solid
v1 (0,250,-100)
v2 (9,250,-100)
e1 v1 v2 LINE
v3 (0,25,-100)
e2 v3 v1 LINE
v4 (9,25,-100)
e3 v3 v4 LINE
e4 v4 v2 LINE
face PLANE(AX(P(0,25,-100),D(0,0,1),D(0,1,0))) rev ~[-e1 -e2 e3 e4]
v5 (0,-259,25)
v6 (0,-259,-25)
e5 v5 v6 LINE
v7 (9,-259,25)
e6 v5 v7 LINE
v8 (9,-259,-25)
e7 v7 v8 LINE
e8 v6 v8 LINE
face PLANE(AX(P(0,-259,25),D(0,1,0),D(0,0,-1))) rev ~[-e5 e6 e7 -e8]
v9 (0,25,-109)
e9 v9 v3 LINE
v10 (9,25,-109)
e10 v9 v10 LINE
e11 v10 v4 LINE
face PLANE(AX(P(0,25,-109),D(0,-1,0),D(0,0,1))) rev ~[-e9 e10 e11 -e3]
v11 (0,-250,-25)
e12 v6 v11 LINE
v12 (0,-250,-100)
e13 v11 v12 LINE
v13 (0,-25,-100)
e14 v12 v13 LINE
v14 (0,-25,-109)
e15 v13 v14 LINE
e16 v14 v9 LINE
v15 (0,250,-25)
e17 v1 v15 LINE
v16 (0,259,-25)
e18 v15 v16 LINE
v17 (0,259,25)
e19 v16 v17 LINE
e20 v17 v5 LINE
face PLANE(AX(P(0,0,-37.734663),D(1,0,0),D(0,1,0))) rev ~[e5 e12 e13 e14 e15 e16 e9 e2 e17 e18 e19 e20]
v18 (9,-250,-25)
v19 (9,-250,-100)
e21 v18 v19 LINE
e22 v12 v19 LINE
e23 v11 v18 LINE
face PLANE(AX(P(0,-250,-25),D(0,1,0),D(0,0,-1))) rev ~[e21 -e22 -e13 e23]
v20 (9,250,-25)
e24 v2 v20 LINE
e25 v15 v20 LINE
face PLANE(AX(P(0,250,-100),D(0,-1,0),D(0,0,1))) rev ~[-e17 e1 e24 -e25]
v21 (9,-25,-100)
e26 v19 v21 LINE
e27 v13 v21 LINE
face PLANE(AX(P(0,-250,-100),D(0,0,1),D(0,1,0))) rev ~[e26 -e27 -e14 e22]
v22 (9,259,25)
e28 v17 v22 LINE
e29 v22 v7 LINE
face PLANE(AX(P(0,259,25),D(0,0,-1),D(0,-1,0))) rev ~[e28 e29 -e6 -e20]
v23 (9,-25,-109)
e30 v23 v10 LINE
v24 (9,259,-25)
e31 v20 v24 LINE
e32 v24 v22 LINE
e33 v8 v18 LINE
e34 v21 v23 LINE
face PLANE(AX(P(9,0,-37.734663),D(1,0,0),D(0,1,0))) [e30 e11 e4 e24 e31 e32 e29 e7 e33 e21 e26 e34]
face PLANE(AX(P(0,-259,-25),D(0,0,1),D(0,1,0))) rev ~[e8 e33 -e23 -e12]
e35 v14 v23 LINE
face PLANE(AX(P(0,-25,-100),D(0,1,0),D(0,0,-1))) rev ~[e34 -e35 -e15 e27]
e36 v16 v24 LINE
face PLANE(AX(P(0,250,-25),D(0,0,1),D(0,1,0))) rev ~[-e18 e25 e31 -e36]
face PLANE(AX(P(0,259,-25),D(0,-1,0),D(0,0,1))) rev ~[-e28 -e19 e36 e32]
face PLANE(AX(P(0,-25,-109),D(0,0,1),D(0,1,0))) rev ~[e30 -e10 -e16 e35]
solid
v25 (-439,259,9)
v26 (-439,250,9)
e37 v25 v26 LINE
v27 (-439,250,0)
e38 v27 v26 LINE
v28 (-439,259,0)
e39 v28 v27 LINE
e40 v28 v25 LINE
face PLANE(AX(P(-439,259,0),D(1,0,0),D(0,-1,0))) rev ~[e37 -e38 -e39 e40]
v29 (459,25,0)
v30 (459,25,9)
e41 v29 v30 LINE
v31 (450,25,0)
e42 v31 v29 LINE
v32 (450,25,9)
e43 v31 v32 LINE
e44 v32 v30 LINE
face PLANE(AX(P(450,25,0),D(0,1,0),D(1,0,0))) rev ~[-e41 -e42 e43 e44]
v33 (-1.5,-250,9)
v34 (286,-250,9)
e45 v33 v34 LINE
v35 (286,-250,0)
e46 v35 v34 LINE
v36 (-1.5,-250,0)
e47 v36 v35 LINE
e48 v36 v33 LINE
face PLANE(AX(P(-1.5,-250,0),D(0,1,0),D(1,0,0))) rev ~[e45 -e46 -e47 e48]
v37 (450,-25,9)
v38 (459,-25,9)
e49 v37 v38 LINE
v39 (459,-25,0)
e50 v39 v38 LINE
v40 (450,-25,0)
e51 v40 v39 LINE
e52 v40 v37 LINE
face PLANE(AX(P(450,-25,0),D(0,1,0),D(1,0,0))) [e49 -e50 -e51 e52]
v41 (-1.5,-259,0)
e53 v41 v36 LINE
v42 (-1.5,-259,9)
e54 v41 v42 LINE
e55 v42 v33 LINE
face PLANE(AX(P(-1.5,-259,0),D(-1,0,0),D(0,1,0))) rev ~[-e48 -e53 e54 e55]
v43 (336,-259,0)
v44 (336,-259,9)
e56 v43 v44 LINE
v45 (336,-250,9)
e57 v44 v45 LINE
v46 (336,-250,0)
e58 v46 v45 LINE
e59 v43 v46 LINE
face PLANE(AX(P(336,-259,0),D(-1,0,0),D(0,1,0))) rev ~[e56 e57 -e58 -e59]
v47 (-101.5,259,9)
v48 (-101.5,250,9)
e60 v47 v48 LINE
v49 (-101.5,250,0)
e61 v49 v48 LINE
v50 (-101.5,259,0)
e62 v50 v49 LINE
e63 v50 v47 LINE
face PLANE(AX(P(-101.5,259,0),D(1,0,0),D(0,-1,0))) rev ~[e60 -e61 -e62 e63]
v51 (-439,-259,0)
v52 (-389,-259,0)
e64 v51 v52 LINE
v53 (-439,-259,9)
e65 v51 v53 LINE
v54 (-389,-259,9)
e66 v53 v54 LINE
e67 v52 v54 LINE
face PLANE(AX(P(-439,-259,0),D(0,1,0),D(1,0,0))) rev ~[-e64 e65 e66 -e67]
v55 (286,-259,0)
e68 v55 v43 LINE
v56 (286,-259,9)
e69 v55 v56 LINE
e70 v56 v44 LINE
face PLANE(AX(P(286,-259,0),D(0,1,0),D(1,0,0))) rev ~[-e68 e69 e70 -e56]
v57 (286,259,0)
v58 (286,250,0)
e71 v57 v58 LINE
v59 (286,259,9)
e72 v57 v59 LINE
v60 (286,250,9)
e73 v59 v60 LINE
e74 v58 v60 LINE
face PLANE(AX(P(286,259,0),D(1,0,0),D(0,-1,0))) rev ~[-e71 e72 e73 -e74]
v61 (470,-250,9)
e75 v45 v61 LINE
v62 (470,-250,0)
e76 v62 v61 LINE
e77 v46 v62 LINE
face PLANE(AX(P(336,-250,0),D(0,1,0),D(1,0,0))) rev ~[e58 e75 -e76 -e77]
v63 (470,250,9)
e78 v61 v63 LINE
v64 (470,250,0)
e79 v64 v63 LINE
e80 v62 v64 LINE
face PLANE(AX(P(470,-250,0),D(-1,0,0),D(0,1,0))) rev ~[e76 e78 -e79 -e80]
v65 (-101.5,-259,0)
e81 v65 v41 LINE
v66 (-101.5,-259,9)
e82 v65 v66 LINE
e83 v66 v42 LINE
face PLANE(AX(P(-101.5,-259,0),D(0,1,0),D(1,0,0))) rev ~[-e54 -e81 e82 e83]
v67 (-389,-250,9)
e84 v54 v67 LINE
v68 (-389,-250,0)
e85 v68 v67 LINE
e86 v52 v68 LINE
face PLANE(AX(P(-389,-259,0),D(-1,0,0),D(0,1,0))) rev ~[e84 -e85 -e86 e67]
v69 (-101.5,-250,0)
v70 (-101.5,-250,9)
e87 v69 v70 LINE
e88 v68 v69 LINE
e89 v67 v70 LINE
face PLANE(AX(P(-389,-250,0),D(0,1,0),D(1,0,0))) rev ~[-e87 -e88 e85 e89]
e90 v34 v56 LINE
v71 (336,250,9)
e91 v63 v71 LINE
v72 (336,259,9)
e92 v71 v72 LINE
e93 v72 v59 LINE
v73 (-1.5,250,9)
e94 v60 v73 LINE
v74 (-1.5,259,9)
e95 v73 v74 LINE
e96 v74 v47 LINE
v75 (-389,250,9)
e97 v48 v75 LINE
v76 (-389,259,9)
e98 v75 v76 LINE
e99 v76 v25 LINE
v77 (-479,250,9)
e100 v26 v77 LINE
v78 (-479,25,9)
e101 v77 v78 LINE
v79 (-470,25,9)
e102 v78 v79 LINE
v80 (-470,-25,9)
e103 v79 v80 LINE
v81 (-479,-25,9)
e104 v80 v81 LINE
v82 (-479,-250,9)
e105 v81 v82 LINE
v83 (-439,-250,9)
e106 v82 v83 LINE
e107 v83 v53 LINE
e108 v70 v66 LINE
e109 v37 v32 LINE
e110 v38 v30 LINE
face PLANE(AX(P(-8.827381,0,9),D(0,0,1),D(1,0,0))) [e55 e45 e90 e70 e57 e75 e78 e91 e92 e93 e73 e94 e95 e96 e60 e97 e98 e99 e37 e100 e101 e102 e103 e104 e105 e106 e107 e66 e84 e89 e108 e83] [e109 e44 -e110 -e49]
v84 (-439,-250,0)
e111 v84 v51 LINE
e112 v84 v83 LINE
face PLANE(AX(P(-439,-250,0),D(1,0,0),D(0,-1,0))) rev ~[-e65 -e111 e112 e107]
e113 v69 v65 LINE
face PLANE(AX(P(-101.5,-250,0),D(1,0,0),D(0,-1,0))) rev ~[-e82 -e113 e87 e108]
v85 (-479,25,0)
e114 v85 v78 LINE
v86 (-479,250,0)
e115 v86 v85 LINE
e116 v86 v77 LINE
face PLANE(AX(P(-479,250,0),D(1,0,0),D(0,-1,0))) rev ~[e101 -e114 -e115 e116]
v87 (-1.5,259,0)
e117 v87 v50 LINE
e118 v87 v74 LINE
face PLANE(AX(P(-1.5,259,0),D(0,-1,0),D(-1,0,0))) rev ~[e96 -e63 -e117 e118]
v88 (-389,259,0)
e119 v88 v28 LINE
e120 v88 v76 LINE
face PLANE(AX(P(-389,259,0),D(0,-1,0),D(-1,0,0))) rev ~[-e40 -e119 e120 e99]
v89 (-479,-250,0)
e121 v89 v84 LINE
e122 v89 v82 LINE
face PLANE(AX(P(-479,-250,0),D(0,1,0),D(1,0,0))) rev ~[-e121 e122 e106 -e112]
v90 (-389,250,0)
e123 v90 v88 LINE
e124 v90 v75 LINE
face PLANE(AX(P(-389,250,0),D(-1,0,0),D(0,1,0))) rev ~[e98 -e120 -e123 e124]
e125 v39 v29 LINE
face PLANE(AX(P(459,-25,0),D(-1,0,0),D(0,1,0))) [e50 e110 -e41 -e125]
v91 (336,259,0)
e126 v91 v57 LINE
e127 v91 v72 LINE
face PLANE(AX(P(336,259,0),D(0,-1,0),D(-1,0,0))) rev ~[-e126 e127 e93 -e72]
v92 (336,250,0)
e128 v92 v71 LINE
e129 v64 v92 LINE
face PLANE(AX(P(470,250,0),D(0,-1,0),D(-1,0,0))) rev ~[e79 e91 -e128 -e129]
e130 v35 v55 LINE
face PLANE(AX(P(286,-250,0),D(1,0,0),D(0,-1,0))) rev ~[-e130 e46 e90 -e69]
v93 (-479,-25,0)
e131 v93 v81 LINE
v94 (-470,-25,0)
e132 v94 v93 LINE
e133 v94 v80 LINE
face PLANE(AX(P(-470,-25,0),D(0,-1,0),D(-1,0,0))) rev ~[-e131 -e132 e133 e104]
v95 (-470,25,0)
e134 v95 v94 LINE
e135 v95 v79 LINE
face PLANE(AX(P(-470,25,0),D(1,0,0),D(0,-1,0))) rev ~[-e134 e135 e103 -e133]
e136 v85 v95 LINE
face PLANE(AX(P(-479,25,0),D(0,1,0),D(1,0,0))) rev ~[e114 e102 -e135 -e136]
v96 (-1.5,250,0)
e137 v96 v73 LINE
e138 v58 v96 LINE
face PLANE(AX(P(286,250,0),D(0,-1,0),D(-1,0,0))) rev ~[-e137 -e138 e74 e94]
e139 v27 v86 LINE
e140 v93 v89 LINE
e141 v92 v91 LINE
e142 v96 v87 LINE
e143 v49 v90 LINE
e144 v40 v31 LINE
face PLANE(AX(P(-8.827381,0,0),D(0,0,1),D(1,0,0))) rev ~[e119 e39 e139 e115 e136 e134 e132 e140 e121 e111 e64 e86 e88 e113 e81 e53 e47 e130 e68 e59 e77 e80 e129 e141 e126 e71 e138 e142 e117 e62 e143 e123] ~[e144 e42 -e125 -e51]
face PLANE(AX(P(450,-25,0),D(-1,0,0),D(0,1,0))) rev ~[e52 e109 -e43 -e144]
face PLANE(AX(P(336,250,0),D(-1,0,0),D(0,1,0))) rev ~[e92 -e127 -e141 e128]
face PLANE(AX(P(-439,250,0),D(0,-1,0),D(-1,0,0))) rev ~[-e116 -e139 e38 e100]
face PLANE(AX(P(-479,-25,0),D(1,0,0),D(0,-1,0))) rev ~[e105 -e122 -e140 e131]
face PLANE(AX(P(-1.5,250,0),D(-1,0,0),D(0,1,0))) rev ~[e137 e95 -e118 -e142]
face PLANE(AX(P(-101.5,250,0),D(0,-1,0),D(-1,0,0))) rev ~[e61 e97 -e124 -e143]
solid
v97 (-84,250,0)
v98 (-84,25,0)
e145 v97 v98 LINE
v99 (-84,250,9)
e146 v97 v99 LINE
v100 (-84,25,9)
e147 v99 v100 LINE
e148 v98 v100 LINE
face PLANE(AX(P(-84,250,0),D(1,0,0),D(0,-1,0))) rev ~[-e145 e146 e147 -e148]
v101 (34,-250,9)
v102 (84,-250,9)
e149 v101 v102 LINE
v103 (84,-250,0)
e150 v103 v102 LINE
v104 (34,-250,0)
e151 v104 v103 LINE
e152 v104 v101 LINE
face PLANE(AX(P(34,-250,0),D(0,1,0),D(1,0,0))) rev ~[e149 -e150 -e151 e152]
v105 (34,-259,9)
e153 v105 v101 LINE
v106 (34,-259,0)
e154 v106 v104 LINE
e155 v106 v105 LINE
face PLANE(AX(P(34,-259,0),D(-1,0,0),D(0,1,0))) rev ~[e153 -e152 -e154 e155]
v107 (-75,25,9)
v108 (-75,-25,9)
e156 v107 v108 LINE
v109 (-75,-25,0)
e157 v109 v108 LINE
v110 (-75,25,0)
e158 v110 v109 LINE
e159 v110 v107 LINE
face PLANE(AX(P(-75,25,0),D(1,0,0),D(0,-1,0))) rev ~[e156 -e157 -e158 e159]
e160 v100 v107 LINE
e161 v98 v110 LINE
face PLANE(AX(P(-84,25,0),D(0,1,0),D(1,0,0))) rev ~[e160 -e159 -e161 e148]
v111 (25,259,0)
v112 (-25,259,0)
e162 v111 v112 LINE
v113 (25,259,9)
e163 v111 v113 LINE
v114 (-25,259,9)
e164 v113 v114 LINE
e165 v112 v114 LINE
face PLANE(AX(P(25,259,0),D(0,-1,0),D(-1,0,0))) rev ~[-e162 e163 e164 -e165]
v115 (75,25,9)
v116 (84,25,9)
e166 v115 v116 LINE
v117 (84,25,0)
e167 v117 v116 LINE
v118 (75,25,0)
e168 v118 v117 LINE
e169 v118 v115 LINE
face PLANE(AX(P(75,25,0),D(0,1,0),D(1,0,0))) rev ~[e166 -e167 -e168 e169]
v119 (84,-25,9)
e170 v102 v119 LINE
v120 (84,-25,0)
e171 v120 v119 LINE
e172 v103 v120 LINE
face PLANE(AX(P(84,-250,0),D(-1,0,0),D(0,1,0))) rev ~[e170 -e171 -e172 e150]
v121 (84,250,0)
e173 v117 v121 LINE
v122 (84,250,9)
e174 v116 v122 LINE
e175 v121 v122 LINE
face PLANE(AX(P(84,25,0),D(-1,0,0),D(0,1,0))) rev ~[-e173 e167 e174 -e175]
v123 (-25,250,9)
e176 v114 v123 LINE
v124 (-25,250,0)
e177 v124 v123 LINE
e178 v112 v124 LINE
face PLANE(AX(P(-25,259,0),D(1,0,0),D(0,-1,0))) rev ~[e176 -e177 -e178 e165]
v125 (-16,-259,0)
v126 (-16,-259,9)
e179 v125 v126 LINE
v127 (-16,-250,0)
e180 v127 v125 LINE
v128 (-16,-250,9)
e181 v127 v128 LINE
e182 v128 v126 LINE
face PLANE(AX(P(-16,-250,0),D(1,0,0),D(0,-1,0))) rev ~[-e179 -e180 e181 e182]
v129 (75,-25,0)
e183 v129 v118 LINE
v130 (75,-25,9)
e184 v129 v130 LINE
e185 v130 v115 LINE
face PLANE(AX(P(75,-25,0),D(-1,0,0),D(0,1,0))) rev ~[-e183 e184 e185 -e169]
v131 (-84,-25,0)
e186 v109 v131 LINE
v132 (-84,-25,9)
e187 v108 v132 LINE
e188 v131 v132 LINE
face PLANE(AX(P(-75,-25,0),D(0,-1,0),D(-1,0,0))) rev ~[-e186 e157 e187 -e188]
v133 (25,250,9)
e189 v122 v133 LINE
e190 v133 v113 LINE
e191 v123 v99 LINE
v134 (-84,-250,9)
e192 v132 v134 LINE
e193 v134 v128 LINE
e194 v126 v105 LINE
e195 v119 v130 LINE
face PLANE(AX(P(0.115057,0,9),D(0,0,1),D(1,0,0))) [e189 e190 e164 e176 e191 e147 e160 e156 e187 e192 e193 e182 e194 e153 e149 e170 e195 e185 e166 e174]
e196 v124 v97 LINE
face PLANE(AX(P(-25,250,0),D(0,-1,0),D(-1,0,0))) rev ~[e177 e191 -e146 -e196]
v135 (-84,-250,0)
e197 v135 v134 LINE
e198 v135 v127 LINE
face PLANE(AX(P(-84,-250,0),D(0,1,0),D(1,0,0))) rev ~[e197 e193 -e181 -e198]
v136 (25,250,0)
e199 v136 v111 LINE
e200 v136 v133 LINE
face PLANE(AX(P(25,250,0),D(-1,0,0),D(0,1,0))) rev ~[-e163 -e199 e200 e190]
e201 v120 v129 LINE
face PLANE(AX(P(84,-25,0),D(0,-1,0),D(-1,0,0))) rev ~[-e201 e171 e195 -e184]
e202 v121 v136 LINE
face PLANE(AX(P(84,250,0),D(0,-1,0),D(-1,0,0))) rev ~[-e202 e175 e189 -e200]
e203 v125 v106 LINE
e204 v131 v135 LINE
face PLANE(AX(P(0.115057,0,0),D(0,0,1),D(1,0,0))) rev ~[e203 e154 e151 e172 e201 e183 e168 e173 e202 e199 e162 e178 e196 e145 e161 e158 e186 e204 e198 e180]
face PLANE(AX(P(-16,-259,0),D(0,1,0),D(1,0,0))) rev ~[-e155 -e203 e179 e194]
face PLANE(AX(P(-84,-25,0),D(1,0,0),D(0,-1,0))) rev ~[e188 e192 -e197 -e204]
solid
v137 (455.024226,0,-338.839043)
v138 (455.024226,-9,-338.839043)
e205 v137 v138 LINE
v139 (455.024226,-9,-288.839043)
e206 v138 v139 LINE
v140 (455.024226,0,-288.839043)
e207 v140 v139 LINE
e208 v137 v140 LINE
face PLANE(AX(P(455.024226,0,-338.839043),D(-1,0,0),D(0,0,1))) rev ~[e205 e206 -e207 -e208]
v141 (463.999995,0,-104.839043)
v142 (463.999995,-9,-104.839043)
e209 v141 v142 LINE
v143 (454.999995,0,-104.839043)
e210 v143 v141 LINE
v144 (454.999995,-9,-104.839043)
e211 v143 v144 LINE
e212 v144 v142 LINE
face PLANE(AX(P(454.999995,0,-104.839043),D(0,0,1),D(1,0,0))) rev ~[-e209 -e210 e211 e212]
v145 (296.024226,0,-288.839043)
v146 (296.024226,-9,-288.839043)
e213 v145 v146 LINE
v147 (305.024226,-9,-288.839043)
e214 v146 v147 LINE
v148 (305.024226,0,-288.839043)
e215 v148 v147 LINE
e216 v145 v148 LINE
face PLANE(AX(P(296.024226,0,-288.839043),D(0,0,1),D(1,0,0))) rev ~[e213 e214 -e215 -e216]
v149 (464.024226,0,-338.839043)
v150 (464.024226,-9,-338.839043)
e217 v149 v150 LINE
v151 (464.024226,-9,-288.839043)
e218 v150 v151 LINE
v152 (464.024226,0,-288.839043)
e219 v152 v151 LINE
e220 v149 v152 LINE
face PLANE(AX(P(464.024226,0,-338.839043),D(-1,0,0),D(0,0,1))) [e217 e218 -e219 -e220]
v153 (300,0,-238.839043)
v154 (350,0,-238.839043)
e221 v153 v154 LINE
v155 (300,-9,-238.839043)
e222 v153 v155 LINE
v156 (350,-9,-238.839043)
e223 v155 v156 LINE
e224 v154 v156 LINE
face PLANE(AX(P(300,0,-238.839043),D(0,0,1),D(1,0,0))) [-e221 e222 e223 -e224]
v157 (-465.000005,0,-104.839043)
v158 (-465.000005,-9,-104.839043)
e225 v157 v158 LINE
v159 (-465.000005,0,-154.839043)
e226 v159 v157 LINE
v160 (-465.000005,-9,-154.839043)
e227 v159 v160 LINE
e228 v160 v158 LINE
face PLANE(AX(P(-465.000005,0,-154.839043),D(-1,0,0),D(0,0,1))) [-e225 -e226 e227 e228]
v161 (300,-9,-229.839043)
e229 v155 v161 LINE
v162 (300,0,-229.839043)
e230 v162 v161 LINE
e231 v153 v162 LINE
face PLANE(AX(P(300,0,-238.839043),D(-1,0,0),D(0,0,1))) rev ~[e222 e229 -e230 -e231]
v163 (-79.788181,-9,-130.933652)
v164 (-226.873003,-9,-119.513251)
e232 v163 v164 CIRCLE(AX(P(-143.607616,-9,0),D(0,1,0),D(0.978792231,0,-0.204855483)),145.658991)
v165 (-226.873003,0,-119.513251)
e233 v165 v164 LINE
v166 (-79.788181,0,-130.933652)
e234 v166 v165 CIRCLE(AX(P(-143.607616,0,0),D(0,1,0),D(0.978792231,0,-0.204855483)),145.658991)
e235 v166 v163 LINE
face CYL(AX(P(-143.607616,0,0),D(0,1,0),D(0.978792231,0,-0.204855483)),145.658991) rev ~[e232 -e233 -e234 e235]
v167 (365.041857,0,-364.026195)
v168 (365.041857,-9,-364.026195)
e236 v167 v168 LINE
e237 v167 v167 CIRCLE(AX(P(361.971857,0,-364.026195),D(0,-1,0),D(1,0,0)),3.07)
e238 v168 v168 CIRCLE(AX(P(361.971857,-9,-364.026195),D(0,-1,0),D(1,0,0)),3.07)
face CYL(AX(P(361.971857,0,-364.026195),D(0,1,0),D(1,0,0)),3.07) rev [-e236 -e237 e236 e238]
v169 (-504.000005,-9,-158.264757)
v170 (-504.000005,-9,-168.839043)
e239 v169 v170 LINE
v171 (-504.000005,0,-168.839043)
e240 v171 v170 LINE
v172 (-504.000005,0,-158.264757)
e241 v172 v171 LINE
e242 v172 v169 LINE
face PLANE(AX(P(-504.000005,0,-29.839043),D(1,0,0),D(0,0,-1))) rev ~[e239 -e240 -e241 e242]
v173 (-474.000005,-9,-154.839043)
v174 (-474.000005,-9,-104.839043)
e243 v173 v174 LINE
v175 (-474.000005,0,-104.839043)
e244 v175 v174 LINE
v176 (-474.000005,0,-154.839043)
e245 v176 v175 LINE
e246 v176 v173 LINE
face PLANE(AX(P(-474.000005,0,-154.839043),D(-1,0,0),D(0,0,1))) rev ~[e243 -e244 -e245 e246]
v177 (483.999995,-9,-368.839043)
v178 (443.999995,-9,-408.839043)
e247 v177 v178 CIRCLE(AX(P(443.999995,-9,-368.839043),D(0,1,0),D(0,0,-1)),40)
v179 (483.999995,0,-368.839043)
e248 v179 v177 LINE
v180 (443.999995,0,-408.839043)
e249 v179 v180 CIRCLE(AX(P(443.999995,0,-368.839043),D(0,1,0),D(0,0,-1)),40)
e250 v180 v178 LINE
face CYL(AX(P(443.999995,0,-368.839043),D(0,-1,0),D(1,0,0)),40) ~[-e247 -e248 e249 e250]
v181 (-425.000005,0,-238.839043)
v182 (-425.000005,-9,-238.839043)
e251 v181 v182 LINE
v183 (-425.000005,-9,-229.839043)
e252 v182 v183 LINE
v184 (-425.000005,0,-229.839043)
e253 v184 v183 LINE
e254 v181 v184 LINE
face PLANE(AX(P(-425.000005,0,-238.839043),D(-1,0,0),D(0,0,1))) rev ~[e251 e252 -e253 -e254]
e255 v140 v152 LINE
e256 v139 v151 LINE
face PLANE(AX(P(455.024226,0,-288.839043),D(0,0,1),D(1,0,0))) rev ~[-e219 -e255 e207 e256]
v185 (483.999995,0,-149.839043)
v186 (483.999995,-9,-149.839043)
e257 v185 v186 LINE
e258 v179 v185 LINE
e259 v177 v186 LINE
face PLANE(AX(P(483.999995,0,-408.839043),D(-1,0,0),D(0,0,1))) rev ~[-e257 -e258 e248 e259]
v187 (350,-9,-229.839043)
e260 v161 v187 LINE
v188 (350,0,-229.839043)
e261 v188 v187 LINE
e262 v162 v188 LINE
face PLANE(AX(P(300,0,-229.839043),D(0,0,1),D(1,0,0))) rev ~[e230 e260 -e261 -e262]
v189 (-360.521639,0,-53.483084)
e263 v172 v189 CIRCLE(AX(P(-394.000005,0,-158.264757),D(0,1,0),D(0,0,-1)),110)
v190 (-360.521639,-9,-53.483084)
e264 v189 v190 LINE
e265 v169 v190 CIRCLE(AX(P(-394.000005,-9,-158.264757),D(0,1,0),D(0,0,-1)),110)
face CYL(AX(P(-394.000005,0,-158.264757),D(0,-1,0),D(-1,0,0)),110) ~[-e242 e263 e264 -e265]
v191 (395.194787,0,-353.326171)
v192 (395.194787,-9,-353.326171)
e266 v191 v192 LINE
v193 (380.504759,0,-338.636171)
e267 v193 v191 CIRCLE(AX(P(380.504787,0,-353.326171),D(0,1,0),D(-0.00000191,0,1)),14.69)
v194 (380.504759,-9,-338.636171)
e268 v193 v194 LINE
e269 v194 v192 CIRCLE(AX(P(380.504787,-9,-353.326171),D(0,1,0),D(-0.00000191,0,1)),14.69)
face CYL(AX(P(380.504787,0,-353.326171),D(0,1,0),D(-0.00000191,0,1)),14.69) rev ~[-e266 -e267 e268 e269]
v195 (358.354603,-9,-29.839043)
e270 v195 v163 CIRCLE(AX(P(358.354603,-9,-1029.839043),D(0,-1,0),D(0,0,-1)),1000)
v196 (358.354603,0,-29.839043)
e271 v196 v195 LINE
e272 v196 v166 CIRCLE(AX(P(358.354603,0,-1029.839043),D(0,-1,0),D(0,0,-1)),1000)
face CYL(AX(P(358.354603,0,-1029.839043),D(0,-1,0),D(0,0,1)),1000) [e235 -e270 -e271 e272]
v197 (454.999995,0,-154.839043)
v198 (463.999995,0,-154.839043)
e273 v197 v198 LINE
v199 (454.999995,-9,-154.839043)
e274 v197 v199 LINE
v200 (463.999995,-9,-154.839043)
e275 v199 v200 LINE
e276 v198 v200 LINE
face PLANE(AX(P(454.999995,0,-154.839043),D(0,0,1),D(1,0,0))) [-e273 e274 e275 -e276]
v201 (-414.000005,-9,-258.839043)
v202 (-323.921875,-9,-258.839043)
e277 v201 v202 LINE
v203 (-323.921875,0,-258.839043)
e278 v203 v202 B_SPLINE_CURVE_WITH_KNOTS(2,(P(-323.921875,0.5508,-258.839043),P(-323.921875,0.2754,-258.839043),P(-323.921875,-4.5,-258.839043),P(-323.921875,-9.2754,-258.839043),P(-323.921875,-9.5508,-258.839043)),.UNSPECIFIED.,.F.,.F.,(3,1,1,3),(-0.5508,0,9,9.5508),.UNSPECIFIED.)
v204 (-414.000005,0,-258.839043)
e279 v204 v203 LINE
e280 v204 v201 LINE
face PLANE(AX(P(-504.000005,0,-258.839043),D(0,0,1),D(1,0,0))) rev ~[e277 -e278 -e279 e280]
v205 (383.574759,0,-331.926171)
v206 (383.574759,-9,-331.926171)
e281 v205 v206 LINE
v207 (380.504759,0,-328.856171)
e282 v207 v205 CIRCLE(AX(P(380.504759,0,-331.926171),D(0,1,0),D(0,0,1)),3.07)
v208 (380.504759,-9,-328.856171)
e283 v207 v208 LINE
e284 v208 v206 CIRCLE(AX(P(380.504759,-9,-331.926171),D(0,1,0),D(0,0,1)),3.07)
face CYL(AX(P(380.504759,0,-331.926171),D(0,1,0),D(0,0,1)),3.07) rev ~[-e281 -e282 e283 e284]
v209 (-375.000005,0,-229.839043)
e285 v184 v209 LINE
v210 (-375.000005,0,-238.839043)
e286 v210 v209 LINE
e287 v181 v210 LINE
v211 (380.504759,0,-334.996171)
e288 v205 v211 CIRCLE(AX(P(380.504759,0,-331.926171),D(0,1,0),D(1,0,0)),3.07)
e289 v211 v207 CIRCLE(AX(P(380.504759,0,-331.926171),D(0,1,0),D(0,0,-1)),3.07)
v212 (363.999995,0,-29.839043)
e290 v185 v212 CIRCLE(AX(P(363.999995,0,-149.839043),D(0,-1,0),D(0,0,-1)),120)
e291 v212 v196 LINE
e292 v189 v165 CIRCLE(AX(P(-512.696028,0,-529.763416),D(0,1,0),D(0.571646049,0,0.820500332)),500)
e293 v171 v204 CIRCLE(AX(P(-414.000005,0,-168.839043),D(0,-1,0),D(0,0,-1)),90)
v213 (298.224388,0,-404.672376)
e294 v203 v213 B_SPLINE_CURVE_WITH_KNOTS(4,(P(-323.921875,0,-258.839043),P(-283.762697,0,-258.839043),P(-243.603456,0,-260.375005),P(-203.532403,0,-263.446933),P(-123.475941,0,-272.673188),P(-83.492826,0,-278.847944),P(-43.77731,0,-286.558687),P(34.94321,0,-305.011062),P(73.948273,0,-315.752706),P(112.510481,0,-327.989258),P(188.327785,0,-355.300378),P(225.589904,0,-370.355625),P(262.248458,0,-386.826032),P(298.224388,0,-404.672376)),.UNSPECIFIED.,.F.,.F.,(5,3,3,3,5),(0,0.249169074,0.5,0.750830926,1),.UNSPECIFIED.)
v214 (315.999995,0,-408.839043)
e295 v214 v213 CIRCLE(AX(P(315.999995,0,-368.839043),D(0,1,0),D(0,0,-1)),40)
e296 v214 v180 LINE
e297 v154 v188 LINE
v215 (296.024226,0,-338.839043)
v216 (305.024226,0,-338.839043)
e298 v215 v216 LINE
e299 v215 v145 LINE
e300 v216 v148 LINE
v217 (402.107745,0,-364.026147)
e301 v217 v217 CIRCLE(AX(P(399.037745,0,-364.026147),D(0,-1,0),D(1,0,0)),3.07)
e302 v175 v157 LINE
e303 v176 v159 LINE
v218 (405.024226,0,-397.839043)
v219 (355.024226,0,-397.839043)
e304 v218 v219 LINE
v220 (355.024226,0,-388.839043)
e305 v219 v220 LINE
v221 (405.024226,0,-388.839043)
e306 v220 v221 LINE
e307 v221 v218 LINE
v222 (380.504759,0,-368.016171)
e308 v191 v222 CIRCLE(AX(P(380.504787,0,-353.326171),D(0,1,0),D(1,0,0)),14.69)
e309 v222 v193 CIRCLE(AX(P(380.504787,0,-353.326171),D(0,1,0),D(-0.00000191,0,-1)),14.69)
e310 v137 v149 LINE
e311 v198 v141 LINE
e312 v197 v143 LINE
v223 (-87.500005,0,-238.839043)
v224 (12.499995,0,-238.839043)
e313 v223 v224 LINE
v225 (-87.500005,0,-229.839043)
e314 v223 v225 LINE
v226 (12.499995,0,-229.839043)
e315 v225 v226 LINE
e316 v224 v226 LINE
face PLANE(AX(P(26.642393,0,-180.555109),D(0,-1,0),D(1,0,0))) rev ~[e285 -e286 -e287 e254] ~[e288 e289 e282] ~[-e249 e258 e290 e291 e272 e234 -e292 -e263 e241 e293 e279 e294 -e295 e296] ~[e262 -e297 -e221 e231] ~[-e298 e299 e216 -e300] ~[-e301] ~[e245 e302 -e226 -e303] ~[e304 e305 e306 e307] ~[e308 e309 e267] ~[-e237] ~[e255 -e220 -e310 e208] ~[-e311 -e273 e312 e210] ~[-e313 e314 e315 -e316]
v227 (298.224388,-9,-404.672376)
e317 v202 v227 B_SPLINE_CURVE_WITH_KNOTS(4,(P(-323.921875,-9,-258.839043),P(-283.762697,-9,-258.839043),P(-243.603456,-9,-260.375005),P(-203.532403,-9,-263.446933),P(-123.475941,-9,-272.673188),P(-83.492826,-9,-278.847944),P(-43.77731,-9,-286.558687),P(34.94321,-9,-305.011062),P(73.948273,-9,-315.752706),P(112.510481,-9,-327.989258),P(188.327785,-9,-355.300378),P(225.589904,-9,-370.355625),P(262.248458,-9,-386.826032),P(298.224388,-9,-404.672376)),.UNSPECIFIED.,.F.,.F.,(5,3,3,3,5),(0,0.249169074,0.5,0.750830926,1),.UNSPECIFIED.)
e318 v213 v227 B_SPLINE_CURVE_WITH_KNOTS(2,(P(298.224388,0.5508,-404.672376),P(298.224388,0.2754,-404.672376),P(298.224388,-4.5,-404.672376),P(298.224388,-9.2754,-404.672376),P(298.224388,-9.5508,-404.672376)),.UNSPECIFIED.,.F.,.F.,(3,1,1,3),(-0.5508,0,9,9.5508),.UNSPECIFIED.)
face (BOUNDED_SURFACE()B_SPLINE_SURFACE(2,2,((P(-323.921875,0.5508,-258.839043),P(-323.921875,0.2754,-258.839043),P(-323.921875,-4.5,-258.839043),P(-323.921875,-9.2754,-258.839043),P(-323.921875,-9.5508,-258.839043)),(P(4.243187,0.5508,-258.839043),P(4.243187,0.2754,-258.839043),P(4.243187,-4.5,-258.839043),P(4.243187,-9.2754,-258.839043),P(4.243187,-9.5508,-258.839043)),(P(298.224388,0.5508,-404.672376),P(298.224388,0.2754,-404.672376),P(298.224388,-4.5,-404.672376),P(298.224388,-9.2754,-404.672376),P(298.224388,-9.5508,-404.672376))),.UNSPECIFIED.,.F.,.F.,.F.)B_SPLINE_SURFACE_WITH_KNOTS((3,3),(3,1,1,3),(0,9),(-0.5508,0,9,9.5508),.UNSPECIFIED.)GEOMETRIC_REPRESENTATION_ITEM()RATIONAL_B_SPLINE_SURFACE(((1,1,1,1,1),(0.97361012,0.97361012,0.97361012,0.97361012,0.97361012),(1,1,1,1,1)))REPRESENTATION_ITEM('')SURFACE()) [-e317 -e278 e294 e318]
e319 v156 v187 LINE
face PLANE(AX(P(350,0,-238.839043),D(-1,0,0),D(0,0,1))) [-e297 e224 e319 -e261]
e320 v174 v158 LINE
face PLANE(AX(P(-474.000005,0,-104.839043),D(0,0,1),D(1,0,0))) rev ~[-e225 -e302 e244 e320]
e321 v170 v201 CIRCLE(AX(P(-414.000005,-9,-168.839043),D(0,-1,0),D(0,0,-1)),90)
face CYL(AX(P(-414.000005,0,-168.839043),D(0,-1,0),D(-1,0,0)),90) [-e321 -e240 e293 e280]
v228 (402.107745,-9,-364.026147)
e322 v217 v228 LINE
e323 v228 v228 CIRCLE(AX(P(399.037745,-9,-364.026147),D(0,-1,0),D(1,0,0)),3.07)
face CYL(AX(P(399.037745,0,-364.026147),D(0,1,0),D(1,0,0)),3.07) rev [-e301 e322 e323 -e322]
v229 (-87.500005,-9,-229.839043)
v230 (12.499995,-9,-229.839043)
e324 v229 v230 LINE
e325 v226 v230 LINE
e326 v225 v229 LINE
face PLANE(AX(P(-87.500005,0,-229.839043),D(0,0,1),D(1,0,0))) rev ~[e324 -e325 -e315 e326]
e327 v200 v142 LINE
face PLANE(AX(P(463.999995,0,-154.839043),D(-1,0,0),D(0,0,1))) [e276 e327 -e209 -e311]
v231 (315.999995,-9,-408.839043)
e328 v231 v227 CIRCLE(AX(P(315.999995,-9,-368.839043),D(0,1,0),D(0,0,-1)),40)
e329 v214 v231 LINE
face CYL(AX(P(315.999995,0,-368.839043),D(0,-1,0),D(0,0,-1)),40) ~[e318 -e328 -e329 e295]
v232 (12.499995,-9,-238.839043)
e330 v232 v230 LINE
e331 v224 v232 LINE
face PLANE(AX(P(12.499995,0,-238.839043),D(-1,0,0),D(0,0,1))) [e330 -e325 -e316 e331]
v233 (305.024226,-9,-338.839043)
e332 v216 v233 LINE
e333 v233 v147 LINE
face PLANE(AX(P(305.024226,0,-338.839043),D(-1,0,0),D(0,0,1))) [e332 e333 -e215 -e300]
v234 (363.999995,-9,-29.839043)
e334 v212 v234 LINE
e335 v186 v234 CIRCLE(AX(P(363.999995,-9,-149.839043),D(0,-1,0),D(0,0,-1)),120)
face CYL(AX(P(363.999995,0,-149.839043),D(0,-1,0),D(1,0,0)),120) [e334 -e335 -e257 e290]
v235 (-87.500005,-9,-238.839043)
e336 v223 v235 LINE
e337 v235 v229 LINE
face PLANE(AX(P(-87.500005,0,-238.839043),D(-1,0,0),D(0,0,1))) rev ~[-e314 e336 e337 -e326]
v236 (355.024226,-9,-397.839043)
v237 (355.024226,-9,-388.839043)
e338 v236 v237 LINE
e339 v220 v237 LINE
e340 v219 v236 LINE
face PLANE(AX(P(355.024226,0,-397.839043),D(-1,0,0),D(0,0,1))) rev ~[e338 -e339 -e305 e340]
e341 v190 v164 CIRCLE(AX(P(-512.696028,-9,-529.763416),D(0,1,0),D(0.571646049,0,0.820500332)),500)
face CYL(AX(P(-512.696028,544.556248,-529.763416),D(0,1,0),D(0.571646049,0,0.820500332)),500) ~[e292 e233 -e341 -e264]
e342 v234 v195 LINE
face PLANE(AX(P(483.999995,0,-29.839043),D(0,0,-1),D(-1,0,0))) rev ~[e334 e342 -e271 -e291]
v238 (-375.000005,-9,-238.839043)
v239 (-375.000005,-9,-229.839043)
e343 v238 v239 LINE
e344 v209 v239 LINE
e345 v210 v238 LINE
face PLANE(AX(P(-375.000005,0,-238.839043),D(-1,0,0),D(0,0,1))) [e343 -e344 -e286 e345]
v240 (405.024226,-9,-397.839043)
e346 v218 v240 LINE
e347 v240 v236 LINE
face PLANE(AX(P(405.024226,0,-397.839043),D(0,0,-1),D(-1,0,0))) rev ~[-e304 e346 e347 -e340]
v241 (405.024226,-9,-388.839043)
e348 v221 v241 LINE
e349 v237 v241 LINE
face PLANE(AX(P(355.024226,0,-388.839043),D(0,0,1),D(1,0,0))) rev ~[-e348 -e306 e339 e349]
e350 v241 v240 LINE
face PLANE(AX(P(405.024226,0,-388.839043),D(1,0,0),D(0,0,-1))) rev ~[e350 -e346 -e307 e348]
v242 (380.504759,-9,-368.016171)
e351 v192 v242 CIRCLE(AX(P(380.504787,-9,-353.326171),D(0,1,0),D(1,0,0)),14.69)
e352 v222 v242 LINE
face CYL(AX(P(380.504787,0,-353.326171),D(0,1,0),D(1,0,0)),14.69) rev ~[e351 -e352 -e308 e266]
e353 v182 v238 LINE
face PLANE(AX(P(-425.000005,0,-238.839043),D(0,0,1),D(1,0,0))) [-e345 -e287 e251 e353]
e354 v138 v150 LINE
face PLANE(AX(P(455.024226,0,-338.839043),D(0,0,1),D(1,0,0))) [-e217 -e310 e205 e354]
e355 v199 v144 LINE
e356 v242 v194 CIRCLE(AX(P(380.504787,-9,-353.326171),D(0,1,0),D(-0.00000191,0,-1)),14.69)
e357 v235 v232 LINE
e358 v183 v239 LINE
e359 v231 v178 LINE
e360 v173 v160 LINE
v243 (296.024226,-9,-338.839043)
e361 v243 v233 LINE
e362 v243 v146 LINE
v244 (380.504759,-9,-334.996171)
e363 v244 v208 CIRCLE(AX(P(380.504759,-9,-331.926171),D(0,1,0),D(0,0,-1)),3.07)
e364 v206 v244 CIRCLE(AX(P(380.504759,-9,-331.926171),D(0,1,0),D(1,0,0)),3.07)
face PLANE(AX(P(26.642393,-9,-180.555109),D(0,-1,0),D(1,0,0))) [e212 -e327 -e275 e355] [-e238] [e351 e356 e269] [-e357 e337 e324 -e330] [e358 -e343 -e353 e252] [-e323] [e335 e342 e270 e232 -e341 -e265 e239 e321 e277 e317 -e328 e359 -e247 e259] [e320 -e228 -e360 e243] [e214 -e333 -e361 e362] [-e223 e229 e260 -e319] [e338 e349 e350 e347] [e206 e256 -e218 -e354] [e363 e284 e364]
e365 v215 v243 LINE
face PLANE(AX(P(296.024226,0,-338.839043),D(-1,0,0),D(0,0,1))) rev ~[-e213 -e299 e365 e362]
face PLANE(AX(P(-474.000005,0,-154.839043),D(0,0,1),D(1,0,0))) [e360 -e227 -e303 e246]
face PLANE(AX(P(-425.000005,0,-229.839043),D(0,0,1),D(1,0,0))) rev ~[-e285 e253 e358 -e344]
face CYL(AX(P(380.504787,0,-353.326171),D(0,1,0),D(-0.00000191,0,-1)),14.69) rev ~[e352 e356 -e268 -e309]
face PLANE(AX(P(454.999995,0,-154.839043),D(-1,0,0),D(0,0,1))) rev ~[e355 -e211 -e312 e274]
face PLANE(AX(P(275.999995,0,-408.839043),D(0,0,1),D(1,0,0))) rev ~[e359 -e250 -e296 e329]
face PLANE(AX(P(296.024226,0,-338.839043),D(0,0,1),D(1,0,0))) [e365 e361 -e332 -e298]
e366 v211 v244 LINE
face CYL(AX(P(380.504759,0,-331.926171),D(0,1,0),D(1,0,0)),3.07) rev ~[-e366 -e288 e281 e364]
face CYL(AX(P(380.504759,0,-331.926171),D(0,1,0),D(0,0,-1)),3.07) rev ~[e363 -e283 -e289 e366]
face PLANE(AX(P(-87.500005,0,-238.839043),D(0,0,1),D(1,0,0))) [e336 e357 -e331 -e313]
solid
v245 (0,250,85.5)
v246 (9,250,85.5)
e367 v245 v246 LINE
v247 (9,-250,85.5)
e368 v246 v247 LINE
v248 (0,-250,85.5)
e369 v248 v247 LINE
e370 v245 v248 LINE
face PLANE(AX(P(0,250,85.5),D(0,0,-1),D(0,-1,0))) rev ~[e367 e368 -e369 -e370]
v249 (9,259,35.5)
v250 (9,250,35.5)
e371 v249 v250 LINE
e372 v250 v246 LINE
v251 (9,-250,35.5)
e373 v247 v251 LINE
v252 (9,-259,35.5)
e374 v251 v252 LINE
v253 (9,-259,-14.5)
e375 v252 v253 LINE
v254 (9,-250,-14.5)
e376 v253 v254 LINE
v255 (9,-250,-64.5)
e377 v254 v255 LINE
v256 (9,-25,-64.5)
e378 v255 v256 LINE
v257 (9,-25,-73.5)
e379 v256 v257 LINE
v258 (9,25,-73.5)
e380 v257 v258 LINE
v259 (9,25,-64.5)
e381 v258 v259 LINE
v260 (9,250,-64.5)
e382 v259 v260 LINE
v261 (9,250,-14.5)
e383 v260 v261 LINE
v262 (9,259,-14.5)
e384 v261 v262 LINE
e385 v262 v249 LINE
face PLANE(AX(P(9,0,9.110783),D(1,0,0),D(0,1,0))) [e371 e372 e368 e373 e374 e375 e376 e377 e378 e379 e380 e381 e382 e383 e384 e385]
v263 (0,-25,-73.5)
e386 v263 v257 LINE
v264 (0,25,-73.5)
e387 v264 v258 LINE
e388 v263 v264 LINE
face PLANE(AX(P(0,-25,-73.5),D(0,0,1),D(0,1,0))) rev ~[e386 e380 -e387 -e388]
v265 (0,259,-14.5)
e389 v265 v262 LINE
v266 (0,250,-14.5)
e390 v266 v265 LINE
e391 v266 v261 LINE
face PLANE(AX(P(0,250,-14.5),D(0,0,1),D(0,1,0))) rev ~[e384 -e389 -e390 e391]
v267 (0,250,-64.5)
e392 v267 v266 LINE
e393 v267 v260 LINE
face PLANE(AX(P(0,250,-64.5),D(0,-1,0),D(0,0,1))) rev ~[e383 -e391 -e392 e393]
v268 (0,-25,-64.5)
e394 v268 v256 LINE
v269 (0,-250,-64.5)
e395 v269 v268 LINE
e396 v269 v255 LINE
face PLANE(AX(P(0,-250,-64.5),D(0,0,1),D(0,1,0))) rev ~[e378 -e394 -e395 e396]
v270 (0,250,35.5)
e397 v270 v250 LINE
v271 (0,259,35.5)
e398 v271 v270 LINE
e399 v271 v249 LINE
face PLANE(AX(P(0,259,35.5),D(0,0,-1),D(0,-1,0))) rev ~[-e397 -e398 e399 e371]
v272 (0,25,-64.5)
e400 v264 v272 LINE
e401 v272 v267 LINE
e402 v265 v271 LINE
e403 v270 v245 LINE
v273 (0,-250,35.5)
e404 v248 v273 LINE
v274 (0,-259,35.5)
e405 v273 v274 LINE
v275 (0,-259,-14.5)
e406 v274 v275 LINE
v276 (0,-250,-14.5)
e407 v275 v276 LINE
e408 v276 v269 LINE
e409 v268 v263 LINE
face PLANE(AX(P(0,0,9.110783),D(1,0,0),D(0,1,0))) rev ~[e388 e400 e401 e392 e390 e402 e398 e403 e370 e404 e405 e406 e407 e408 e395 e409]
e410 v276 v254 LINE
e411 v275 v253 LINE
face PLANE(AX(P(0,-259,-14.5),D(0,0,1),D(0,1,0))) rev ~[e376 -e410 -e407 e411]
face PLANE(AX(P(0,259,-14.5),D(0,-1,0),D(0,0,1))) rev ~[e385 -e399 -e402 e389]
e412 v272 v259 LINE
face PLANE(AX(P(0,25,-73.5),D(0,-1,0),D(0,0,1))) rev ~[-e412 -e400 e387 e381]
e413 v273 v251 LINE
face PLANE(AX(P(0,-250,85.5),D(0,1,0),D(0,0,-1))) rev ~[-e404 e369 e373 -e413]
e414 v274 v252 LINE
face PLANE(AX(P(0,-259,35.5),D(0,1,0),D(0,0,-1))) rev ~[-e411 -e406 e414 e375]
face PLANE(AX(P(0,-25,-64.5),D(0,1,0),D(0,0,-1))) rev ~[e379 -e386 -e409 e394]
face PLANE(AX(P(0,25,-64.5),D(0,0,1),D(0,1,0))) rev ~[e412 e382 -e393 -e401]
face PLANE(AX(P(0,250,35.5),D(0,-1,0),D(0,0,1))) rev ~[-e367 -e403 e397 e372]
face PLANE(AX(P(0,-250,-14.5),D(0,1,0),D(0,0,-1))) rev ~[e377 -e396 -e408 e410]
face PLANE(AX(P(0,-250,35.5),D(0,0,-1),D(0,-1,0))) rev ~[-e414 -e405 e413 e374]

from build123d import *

# Parameters (mm, degrees)
F0_W         = 50
F0_H         = 9
F0_W_2       = 100
F0_R         = 3.07
F0_W_3       = 9
F0_H_2       = 50
F5_DEPTH     = 9
F6_R         = 40
F1_W         = 9
F1_H         = 50
F7_DEPTH     = 9
F8_DEPTH     = 9
F9_DEPTH     = 9
F10_R        = 1000
F11_T1_DEPTH = 1098.1124961061
F12_R        = 110
F13_R        = 90
F14_R        = 1400
F15_R        = 120
F16_DEPTH    = 9


# Not quite as in the source:
# - a fillet or chamfer that OpenCascade refuses, or shapes differently, is made with other operations: its cross-section is extruded or revolved along the edge and cut away or added


with BuildPart() as f5:
    # F0 (on Front) → F5 (new body)
    with BuildSketch(Plane.XZ):
        with BuildLine():
            Line((483.9999953733, -408.8390429476), (483.9999953733, -338.8390429476))
            Line((483.9999953733, -338.8390429476), (483.9999953733, -229.8390429476))
            Line((483.9999953733, -229.8390429476), (483.9999953733, -39.8390429476))
            Line((483.9999953733, -39.8390429476), (483.9999953733, -29.8390429476))
            Line((483.9999953733, -29.8390429476), (473.9999953733, -29.8390429476))
            Line((473.9999953733, -29.8390429476), (454.9999953733, -29.8390429476))
            Line((454.9999953733, -29.8390429476), (-1.0377274437, -29.8390429476))
            ThreePointArc((-1.0377274437, -29.8390429476), (-143.6076164246, -145.6589912366), (-286.1775054055, -29.8390429476))
            Line((-286.1775054055, -29.8390429476), (-494.0000046267, -29.8390429476))
            Line((-494.0000046267, -29.8390429476), (-504.0000046267, -29.8390429476))
            Line((-504.0000046267, -29.8390429476), (-504.0000046267, -39.8390429476))
            Line((-504.0000046267, -39.8390429476), (-504.0000046267, -104.8390429476))
            Line((-504.0000046267, -104.8390429476), (-504.0000046267, -258.8390429476))
            Line((-504.0000046267, -258.8390429476), (15.1211131069, -258.8390429476))
            Line((15.1211131069, -258.8390429476), (275.9999953733, -258.8390429476))
            Line((275.9999953733, -258.8390429476), (275.9999953733, -408.8390429476))
            Line((275.9999953733, -408.8390429476), (483.9999953733, -408.8390429476))
        make_face()
        with Locations((-400.0000046267, -234.3390429476)):
            Rectangle(F0_W, F0_H, mode=Mode.SUBTRACT)
        with Locations((-37.5000046267, -234.3390429476)):
            Rectangle(F0_W_2, F0_H, mode=Mode.SUBTRACT)
        Polygon((380.5047589158, -388.8390429476), (405.0242262696, -388.8390429476), (405.0242262696, -397.8390429476), (355.0242262696, -397.8390429476), (355.0242262696, -388.8390429476), align=None, mode=Mode.SUBTRACT)
        with Locations((361.9718573535, -364.0261951481)):
            Circle(F0_R, mode=Mode.SUBTRACT)
        with Locations((399.0377446354, -364.0261465598)):
            Circle(F0_R, mode=Mode.SUBTRACT)
        with BuildLine():
            ThreePointArc((395.1947869682, -353.3261708539), (390.8921756658, -363.7135793876), (380.5047589158, -368.0161708539))
            ThreePointArc((380.5047589158, -368.0161708539), (365.8147869682, -353.3261708539), (380.5047589158, -338.636170854))
            ThreePointArc((380.5047589158, -338.636170854), (390.8921756658, -342.9387623203), (395.1947869682, -353.3261708539))
        make_face(mode=Mode.SUBTRACT)
        with BuildLine():
            ThreePointArc((383.5747589158, -331.9261708539), (382.675576734, -334.0969886722), (380.5047589158, -334.9961708539))
            ThreePointArc((380.5047589158, -334.9961708539), (377.4347589158, -331.9261708539), (380.5047589158, -328.8561708539))
            ThreePointArc((380.5047589158, -328.8561708539), (382.675576734, -329.7553530357), (383.5747589158, -331.9261708539))
        make_face(mode=Mode.SUBTRACT)
        with Locations((300.5242262696, -313.8390429476)):
            Rectangle(F0_W_3, F0_H_2, mode=Mode.SUBTRACT)
        with Locations((459.5242262696, -313.8390429476)):
            Rectangle(F0_W_3, F0_H_2, mode=Mode.SUBTRACT)
        with Locations((325, -234.3390429476)):
            Rectangle(F0_W, F0_H, mode=Mode.SUBTRACT)
        with Locations((-469.5000046267, -129.8390429476)):
            Rectangle(F0_W_3, F0_H_2, mode=Mode.SUBTRACT)
        with Locations((459.4999953733, -129.8390429476)):
            Rectangle(F0_W_3, F0_H_2, mode=Mode.SUBTRACT)
    extrude(amount=F5_DEPTH)

    # F6
    f6_edges = [f5.edges().sort_by_distance(p)[0] for p in [
        (483.999995, -4.5, -408.839043),
        (275.999995, -4.5, -408.839043),
    ]]
    fillet(f6_edges, radius=F6_R)

    # F10
    f10_edges = [f5.edges().sort_by_distance(p)[0] for p in [
        (-1.037727, -4.5, -29.839043),
    ]]
    fillet(f10_edges, radius=F10_R)

    # F11: fillet of radius 500 on 1 edges, made by hand

    # F11_s2 → F11_t1 (cut)
    with BuildSketch(Plane.XZ.offset(-544.5562480531)):
        with BuildLine():
            ThreePointArc((-226.8730033326, -119.5132506089), (-358.7618430578, -54.0489361882), (-504.0000046267, -29.8390429476))
            Line((-504.0000046267, -29.8390429476), (-286.1775054055, -29.8390429476))
            ThreePointArc((-286.1775054055, -29.8390429476), (-265.1014798041, -80.3478866503), (-226.8730033326, -119.5132506089))
        make_face()
    extrude(amount=F11_T1_DEPTH, mode=Mode.SUBTRACT)

    # F12
    f12_edges = [f5.edges().sort_by_distance(p)[0] for p in [
        (-504.000005, -4.5, -29.839043),
    ]]
    fillet(f12_edges, radius=F12_R)

    # F13
    f13_edges = [f5.edges().sort_by_distance(p)[0] for p in [
        (-504.000005, -4.5, -258.839043),
    ]]
    fillet(f13_edges, radius=F13_R)

    # F14
    f14_edges = [f5.edges().sort_by_distance(p)[0] for p in [
        (275.999995, -4.5, -258.839043),
    ]]
    fillet(f14_edges, radius=F14_R)

    # F15
    f15_edges = [f5.edges().sort_by_distance(p)[0] for p in [
        (483.999995, -4.5, -29.839043),
    ]]
    fillet(f15_edges, radius=F15_R)


with BuildPart() as f7:
    # F1 (on Top) → F7 (new body)
    with BuildSketch(Plane.XY):
        Polygon((470, -250), (470, 250), (336, 250), (336, 259), (286, 259), (286, 250), (-1.5, 250), (-1.5, 259), (-101.5, 259), (-101.5, 250), (-389, 250), (-389, 259), (-439, 259), (-439, 250), (-479, 250), (-479, 25), (-470, 25), (-470, -25), (-479, -25), (-479, -250), (-439, -250), (-439, -259), (-389, -259), (-389, -250), (-101.5, -250), (-101.5, -259), (-1.5, -259), (-1.5, -250), (286, -250), (286, -259), (336, -259), (336, -250), align=None)
        with Locations((454.5, 0)):
            Rectangle(F1_W, F1_H, mode=Mode.SUBTRACT)
    extrude(amount=F7_DEPTH)


with BuildPart() as f8:
    # F3 (on face) → F8 (new body)
    with BuildSketch(Plane.XY):
        Polygon((34, -250), (84, -250), (84, -25), (75, -25), (75, 25), (84, 25), (84, 250), (25, 250), (25, 259), (-25, 259), (-25, 250), (-84, 250), (-84, 25), (-75, 25), (-75, -25), (-84, -25), (-84, -250), (-16, -250), (-16, -259), (34, -259), align=None)
    extrude(amount=F8_DEPTH)


with BuildPart() as f9:
    # F4 (on face) → F9 (new body)
    with BuildSketch(Plane.YZ):
        Polygon((250, 35.5), (250, 85.5), (25, 85.5), (-25, 85.5), (-250, 85.5), (-250, 35.5), (-259, 35.5), (-259, -14.5), (-250, -14.5), (-250, -64.5), (-25, -64.5), (-25, -73.5), (25, -73.5), (25, -64.5), (250, -64.5), (250, -14.5), (259, -14.5), (259, 35.5), align=None)
    extrude(amount=F9_DEPTH)


with BuildPart() as f16:
    # F2 (on Right) → F16 (new body)
    with BuildSketch(Plane.YZ):
        Polygon((-250, -25), (-250, -100), (-25, -100), (-25, -109), (25, -109), (25, -100), (250, -100), (250, -25), (259, -25), (259, 25), (250, 25), (-250, 25), (-259, 25), (-259, -25), align=None)
    extrude(amount=F16_DEPTH)


solid = Compound([f5.part, f7.part, f8.part, f9.part, f16.part])
